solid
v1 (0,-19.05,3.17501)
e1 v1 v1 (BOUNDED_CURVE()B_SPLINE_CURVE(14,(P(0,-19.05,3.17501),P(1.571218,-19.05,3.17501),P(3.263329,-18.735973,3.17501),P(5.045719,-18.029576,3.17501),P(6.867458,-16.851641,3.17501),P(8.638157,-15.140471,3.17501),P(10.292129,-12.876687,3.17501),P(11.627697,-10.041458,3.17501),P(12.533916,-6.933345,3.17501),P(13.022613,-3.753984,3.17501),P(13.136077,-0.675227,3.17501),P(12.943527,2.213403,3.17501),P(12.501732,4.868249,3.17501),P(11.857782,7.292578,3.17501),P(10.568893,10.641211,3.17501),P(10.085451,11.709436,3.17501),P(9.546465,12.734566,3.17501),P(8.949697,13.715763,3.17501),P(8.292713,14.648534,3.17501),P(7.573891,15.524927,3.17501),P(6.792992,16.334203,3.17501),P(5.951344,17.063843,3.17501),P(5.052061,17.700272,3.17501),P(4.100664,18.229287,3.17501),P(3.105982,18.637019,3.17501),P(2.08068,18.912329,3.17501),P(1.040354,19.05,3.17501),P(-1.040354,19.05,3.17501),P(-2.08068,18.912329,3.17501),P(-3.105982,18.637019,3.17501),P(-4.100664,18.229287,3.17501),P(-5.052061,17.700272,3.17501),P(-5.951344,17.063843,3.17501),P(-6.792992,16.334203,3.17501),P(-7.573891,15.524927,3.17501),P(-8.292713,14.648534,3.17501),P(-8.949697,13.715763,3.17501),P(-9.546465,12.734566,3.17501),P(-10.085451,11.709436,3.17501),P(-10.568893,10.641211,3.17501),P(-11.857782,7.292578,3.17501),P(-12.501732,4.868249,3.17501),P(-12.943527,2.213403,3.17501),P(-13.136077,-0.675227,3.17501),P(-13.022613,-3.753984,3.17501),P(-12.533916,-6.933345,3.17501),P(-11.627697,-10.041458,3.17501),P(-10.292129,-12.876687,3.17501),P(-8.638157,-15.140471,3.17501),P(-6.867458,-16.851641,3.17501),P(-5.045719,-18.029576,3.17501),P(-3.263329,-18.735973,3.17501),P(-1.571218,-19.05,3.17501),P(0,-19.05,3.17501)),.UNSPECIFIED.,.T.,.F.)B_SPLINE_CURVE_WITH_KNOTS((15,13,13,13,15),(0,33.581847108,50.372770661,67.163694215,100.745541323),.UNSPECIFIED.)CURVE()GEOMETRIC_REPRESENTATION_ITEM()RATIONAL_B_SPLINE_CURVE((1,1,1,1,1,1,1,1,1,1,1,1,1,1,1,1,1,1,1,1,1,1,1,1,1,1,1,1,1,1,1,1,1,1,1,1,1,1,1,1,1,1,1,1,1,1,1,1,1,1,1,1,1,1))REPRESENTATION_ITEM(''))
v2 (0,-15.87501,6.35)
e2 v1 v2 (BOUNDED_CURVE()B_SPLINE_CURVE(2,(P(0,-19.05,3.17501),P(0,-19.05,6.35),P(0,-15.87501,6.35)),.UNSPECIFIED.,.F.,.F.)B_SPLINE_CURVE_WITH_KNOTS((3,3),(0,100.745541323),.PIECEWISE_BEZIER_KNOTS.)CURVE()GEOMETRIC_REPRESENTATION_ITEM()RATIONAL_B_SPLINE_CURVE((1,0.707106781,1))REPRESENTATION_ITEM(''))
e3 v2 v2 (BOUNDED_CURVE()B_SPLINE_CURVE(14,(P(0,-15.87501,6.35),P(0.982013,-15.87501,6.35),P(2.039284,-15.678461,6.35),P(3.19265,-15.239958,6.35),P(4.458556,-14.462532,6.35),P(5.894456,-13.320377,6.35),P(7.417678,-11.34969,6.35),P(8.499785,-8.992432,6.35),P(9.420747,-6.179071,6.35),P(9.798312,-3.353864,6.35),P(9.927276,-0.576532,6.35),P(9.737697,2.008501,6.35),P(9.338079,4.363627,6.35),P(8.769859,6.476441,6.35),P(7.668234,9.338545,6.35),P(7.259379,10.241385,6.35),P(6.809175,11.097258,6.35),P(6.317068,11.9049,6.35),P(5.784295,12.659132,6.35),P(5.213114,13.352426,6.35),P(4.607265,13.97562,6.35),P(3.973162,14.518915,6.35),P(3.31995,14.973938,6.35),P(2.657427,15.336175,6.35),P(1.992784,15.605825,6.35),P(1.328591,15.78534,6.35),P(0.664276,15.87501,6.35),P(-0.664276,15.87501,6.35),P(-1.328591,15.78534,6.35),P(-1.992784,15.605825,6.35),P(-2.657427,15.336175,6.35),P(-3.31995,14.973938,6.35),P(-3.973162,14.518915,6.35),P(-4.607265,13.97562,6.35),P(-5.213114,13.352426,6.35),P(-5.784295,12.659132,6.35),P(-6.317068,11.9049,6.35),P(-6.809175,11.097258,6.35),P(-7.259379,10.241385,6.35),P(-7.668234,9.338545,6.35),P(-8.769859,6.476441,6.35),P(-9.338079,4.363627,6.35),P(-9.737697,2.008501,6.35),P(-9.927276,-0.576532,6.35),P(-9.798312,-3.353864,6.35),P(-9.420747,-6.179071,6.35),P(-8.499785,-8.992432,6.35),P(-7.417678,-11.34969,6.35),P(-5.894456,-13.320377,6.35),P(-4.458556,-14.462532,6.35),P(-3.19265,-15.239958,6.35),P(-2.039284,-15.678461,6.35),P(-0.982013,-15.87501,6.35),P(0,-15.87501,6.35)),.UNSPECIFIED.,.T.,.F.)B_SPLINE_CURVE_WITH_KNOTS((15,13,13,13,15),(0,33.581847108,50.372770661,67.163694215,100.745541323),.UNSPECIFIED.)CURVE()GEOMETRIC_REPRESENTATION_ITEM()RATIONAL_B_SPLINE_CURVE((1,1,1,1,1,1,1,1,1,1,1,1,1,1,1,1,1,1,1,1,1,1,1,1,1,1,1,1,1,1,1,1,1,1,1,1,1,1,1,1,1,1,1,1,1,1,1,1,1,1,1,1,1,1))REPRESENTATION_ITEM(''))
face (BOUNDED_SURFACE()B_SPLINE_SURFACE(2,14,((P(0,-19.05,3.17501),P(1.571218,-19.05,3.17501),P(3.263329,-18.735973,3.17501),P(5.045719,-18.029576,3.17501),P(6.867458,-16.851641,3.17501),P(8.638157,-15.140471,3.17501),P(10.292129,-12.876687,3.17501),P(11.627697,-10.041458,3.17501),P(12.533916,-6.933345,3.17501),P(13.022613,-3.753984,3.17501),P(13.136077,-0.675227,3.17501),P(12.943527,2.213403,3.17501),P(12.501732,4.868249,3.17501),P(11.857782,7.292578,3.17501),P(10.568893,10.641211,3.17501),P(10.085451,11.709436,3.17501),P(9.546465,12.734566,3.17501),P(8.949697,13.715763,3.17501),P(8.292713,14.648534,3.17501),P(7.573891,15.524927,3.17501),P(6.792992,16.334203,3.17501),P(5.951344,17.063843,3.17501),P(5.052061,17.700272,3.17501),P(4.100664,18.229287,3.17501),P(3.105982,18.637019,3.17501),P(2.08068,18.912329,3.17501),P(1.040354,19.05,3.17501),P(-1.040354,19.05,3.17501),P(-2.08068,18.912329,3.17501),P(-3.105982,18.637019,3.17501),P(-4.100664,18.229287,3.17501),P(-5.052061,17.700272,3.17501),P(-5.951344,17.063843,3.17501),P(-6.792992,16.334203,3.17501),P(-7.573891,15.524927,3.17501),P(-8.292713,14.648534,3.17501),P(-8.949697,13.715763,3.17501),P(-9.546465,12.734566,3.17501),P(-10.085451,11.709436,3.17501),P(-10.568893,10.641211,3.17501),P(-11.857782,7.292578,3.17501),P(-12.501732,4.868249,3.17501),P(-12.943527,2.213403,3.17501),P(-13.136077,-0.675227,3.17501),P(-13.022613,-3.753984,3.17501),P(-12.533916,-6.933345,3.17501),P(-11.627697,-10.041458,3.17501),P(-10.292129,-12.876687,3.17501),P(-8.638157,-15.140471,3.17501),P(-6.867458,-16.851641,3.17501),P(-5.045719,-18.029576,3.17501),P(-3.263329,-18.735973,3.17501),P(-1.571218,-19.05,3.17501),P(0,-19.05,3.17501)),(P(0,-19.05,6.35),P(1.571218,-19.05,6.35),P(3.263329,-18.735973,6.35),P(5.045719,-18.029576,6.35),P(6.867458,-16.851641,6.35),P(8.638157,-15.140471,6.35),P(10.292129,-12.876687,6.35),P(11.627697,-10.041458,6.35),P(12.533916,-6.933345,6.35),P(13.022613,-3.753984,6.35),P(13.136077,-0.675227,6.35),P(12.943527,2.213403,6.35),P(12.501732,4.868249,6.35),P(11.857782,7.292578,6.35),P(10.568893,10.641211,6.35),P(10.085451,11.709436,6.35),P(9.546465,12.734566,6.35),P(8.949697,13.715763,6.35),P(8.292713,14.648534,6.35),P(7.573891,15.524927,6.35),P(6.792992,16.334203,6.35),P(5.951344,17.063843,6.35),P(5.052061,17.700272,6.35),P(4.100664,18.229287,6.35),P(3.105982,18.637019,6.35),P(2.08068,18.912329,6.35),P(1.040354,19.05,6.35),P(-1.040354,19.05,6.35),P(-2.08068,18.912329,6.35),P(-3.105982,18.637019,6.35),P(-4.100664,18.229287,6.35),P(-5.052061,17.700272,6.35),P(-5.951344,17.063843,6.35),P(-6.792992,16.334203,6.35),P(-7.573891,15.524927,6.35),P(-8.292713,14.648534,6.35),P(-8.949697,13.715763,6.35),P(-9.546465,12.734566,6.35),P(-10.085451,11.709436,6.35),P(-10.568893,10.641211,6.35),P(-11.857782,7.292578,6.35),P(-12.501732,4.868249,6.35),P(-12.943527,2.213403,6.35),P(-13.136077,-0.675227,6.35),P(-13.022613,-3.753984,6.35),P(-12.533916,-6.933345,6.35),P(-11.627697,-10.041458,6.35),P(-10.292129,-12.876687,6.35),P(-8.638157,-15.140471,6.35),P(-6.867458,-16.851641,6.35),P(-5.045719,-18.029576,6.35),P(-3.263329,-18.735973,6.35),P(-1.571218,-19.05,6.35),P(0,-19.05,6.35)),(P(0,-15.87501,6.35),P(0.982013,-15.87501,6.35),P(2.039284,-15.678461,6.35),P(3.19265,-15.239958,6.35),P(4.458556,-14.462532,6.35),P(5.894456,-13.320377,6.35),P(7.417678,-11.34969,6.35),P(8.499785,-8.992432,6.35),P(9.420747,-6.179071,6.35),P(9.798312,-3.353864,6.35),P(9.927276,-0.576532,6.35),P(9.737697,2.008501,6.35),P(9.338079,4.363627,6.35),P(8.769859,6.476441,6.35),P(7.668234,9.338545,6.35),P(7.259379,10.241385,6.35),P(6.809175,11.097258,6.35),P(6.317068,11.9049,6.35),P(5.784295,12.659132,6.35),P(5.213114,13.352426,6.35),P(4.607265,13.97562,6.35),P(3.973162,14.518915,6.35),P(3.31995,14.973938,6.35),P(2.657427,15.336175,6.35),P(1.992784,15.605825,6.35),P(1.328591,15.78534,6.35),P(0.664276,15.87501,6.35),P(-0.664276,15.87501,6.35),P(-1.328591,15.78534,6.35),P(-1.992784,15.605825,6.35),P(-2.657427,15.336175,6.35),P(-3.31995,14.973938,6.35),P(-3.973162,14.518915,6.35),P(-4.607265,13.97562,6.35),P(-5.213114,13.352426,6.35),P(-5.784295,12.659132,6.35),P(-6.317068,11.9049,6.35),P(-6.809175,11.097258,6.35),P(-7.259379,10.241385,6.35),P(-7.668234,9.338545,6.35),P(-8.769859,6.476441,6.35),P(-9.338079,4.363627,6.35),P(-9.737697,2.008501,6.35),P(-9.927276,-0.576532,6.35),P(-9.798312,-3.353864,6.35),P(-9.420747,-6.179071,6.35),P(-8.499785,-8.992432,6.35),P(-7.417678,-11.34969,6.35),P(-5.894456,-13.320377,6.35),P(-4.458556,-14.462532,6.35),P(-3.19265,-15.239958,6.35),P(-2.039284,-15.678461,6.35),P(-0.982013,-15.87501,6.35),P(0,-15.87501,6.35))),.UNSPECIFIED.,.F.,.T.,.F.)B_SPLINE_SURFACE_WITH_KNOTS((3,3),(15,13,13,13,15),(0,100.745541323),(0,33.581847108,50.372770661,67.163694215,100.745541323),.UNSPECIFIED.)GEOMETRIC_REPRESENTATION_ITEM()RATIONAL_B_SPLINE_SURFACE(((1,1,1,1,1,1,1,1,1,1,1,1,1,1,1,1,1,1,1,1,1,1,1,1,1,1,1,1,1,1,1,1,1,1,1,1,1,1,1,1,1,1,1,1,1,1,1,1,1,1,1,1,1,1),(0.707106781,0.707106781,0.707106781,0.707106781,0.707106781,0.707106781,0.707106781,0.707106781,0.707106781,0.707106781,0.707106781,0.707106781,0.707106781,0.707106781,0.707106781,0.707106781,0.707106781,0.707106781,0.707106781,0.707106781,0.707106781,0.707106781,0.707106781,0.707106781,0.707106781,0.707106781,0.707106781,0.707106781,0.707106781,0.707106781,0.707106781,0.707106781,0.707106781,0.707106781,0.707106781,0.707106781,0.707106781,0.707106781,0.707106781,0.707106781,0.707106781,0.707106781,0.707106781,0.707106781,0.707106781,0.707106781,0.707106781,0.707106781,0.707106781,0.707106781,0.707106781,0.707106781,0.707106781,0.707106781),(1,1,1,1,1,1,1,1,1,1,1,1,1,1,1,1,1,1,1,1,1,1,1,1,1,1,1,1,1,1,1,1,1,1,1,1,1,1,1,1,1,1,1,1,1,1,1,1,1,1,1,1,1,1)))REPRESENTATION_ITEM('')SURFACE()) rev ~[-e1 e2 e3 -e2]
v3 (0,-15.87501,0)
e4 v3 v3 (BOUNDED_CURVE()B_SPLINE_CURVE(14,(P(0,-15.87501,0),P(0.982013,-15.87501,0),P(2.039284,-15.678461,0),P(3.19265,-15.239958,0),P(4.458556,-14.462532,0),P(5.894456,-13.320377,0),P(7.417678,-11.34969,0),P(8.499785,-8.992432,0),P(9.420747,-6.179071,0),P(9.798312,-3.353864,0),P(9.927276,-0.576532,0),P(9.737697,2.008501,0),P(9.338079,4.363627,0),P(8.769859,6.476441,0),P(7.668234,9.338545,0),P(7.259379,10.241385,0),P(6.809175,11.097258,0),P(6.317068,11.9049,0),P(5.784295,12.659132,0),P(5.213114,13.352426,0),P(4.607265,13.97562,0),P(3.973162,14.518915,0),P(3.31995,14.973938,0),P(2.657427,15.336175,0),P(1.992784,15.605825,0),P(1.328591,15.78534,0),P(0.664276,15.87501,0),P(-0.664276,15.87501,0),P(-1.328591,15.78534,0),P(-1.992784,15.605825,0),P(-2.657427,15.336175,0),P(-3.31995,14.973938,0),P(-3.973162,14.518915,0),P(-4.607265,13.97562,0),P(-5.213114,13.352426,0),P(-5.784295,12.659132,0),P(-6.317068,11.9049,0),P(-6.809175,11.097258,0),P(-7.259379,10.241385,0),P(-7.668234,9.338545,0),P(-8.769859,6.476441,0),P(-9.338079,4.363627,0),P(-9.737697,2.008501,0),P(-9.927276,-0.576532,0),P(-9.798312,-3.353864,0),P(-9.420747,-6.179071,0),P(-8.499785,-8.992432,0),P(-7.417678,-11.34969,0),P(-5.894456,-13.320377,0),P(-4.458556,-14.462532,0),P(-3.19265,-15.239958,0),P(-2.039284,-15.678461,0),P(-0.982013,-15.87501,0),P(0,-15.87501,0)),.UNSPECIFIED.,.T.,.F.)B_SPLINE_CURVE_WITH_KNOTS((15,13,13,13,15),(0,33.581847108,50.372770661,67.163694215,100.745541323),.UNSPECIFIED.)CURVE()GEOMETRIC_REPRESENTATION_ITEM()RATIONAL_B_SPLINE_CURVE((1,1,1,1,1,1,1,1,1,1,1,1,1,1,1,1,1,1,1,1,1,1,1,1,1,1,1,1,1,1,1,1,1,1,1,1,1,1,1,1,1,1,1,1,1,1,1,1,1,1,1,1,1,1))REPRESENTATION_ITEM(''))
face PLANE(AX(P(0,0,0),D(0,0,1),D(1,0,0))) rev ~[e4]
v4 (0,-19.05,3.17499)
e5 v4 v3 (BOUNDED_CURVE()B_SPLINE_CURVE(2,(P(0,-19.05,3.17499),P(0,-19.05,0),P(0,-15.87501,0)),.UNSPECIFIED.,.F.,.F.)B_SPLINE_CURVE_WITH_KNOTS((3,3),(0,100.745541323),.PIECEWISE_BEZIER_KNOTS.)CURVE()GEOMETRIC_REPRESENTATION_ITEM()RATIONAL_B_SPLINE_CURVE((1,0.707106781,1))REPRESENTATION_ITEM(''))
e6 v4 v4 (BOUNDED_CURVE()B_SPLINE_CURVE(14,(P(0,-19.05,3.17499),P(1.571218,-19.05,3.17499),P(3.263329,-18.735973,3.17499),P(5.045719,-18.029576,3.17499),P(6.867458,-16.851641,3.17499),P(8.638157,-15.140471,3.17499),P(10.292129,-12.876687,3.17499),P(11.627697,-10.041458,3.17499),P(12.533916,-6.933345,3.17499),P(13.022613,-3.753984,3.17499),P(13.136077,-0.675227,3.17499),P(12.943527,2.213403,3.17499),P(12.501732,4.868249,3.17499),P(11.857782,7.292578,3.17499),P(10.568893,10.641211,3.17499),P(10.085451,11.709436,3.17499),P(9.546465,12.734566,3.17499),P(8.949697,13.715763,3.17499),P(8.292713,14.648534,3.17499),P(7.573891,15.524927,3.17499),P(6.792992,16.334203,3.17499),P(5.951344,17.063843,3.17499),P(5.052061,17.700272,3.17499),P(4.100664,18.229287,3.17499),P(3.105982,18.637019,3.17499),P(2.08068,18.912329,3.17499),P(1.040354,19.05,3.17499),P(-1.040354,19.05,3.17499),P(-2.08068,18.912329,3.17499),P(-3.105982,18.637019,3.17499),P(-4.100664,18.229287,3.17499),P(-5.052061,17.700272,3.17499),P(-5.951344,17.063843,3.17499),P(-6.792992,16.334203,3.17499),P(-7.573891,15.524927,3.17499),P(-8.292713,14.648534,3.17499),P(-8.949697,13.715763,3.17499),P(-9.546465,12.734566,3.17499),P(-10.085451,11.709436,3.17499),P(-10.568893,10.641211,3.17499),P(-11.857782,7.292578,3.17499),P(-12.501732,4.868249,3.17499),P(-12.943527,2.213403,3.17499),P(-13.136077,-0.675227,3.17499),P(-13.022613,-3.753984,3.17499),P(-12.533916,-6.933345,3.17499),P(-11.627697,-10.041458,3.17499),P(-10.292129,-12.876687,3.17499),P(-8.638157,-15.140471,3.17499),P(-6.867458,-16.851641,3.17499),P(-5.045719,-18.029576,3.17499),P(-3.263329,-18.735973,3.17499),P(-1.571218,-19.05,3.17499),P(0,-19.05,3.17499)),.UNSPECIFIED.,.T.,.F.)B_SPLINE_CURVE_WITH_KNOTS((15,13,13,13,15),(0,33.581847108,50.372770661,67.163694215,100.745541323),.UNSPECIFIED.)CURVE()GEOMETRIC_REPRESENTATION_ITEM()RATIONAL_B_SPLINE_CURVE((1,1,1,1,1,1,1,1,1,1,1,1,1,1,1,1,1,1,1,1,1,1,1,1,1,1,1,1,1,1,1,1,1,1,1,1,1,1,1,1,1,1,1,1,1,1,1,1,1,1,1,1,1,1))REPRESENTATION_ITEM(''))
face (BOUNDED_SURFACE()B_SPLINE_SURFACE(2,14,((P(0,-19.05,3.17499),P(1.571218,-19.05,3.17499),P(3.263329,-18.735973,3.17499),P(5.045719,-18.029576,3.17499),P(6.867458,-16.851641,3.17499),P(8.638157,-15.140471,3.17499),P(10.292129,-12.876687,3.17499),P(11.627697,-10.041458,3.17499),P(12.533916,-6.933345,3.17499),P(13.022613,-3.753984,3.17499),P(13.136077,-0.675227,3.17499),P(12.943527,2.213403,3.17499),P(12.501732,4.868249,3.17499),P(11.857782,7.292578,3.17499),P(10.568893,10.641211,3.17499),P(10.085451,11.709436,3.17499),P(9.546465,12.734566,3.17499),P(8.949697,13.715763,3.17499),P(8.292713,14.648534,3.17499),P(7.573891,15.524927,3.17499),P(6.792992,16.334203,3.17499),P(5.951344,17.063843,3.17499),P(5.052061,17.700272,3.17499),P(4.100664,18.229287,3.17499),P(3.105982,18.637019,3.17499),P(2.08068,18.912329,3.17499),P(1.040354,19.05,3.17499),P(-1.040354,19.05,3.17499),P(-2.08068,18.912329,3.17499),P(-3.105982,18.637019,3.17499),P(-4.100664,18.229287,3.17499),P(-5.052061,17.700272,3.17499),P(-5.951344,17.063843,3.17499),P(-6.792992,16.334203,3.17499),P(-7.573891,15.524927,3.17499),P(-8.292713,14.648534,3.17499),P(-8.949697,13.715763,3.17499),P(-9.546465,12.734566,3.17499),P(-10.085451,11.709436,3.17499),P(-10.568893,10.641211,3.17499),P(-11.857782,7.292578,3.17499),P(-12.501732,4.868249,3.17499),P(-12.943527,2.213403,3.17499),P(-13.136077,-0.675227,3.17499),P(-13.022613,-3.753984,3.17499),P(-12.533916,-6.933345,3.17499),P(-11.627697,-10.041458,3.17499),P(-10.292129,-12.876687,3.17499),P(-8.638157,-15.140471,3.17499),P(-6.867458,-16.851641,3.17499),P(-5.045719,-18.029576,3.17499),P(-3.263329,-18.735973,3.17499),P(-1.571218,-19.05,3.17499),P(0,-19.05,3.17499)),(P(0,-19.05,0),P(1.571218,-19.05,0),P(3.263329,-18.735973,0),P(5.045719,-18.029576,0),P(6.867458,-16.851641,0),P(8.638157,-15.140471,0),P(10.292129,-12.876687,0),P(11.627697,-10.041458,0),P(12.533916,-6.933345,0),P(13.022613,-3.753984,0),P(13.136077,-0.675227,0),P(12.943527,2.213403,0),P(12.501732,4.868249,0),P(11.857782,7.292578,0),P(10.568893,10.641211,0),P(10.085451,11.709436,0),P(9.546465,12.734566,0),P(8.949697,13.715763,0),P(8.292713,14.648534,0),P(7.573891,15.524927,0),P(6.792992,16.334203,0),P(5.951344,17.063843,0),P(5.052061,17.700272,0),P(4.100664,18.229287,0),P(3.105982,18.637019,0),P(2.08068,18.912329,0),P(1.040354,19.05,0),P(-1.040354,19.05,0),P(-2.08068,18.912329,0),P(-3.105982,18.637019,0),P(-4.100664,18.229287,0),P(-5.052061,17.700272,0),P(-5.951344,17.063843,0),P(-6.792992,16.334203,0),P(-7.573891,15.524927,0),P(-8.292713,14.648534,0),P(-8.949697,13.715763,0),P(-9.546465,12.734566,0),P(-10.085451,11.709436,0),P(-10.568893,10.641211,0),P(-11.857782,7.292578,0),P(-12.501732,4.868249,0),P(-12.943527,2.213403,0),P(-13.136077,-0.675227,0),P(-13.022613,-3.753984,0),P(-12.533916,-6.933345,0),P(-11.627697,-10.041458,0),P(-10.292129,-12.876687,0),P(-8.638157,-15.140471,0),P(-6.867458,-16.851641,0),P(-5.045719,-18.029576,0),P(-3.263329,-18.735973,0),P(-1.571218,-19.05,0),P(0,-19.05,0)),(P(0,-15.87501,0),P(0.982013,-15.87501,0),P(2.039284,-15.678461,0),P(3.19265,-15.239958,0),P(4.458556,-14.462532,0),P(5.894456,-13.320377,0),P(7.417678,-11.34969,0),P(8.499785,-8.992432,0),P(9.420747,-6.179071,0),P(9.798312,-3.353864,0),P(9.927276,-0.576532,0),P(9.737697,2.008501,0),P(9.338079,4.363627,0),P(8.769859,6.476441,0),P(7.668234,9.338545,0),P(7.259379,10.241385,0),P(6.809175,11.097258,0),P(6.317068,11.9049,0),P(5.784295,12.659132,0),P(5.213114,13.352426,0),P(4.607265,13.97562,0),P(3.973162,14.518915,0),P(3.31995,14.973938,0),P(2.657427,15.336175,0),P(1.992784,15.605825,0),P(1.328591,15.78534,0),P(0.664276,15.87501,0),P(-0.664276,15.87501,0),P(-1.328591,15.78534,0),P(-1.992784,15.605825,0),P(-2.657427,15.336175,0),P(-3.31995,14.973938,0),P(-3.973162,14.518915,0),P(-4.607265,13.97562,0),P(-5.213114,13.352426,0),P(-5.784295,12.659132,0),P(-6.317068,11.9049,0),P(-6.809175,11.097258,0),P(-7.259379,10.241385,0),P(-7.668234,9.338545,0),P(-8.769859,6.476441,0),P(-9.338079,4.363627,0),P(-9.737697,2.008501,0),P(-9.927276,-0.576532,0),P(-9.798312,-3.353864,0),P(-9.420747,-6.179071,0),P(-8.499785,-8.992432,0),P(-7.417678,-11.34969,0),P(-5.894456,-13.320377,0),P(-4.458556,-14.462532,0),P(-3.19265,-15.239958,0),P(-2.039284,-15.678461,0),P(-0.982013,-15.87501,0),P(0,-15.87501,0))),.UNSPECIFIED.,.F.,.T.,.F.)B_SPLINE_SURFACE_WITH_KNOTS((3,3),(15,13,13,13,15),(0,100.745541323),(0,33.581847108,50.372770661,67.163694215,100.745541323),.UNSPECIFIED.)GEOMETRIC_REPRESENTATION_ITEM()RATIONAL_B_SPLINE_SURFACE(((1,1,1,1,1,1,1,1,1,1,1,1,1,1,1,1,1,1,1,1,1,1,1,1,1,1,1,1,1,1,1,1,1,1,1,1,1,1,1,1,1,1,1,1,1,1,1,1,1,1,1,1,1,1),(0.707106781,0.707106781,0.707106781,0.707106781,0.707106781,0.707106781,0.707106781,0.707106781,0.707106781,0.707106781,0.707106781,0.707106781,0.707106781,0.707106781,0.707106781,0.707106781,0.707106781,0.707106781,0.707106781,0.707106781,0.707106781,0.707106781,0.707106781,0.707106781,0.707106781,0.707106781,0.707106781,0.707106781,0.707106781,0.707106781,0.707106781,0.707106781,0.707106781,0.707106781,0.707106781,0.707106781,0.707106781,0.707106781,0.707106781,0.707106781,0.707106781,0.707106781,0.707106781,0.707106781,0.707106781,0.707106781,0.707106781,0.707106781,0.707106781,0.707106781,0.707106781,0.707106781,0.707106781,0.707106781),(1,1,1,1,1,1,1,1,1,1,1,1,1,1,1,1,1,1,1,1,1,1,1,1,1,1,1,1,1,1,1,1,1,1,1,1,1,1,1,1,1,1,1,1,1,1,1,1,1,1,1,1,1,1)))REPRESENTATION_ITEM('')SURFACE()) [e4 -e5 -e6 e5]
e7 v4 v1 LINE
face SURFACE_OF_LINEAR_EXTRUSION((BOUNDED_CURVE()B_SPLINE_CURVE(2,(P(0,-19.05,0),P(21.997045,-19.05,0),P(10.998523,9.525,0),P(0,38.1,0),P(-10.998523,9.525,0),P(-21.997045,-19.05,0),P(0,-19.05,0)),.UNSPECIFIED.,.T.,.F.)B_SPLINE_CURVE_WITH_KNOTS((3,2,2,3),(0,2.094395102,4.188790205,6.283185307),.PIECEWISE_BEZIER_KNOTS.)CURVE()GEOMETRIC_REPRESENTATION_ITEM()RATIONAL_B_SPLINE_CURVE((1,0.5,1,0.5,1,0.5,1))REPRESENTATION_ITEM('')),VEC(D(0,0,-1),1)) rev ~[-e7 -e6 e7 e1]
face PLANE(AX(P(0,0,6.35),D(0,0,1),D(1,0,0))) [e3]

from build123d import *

# Parameters (mm, degrees)
F1_DEPTH = 6.35
F2_R     = 3.17499


# Not quite as in the source:
# - a fillet or chamfer is up to 0.001 mm smaller than in the source, because OpenCascade refuses the exact size


with BuildPart() as f1:
    # F0 (on Top) → F1 (new body)
    with BuildSketch(Plane.XY):
        with BuildLine():
            add(Edge.make_bspline(
                [(0, -19.05), (21.9970452561, -19.05), (10.9985226281, 9.525), (0, 38.1), (-10.9985226281, 9.525), (-21.9970452561, -19.05), (0, -19.05)],
                knots=[0, 0, 0, 2.0943951024, 2.0943951024, 4.1887902048, 4.1887902048, 6.2831853072, 6.2831853072, 6.2831853072], degree=2, weights=[1, 0.5, 1, 0.5, 1, 0.5, 1]))
        make_face()
    extrude(amount=F1_DEPTH)

    # F2 (radius 3.175 in the source; OpenCascade refuses exactly that, so slightly less here)
    f2_edges = [f1.edges().sort_by_distance(p)[0] for p in [
        (0, 19.05, 6.35),
        (0, 19.05, 0),
    ]]
    fillet(f2_edges, radius=F2_R)


solid = f1.part
